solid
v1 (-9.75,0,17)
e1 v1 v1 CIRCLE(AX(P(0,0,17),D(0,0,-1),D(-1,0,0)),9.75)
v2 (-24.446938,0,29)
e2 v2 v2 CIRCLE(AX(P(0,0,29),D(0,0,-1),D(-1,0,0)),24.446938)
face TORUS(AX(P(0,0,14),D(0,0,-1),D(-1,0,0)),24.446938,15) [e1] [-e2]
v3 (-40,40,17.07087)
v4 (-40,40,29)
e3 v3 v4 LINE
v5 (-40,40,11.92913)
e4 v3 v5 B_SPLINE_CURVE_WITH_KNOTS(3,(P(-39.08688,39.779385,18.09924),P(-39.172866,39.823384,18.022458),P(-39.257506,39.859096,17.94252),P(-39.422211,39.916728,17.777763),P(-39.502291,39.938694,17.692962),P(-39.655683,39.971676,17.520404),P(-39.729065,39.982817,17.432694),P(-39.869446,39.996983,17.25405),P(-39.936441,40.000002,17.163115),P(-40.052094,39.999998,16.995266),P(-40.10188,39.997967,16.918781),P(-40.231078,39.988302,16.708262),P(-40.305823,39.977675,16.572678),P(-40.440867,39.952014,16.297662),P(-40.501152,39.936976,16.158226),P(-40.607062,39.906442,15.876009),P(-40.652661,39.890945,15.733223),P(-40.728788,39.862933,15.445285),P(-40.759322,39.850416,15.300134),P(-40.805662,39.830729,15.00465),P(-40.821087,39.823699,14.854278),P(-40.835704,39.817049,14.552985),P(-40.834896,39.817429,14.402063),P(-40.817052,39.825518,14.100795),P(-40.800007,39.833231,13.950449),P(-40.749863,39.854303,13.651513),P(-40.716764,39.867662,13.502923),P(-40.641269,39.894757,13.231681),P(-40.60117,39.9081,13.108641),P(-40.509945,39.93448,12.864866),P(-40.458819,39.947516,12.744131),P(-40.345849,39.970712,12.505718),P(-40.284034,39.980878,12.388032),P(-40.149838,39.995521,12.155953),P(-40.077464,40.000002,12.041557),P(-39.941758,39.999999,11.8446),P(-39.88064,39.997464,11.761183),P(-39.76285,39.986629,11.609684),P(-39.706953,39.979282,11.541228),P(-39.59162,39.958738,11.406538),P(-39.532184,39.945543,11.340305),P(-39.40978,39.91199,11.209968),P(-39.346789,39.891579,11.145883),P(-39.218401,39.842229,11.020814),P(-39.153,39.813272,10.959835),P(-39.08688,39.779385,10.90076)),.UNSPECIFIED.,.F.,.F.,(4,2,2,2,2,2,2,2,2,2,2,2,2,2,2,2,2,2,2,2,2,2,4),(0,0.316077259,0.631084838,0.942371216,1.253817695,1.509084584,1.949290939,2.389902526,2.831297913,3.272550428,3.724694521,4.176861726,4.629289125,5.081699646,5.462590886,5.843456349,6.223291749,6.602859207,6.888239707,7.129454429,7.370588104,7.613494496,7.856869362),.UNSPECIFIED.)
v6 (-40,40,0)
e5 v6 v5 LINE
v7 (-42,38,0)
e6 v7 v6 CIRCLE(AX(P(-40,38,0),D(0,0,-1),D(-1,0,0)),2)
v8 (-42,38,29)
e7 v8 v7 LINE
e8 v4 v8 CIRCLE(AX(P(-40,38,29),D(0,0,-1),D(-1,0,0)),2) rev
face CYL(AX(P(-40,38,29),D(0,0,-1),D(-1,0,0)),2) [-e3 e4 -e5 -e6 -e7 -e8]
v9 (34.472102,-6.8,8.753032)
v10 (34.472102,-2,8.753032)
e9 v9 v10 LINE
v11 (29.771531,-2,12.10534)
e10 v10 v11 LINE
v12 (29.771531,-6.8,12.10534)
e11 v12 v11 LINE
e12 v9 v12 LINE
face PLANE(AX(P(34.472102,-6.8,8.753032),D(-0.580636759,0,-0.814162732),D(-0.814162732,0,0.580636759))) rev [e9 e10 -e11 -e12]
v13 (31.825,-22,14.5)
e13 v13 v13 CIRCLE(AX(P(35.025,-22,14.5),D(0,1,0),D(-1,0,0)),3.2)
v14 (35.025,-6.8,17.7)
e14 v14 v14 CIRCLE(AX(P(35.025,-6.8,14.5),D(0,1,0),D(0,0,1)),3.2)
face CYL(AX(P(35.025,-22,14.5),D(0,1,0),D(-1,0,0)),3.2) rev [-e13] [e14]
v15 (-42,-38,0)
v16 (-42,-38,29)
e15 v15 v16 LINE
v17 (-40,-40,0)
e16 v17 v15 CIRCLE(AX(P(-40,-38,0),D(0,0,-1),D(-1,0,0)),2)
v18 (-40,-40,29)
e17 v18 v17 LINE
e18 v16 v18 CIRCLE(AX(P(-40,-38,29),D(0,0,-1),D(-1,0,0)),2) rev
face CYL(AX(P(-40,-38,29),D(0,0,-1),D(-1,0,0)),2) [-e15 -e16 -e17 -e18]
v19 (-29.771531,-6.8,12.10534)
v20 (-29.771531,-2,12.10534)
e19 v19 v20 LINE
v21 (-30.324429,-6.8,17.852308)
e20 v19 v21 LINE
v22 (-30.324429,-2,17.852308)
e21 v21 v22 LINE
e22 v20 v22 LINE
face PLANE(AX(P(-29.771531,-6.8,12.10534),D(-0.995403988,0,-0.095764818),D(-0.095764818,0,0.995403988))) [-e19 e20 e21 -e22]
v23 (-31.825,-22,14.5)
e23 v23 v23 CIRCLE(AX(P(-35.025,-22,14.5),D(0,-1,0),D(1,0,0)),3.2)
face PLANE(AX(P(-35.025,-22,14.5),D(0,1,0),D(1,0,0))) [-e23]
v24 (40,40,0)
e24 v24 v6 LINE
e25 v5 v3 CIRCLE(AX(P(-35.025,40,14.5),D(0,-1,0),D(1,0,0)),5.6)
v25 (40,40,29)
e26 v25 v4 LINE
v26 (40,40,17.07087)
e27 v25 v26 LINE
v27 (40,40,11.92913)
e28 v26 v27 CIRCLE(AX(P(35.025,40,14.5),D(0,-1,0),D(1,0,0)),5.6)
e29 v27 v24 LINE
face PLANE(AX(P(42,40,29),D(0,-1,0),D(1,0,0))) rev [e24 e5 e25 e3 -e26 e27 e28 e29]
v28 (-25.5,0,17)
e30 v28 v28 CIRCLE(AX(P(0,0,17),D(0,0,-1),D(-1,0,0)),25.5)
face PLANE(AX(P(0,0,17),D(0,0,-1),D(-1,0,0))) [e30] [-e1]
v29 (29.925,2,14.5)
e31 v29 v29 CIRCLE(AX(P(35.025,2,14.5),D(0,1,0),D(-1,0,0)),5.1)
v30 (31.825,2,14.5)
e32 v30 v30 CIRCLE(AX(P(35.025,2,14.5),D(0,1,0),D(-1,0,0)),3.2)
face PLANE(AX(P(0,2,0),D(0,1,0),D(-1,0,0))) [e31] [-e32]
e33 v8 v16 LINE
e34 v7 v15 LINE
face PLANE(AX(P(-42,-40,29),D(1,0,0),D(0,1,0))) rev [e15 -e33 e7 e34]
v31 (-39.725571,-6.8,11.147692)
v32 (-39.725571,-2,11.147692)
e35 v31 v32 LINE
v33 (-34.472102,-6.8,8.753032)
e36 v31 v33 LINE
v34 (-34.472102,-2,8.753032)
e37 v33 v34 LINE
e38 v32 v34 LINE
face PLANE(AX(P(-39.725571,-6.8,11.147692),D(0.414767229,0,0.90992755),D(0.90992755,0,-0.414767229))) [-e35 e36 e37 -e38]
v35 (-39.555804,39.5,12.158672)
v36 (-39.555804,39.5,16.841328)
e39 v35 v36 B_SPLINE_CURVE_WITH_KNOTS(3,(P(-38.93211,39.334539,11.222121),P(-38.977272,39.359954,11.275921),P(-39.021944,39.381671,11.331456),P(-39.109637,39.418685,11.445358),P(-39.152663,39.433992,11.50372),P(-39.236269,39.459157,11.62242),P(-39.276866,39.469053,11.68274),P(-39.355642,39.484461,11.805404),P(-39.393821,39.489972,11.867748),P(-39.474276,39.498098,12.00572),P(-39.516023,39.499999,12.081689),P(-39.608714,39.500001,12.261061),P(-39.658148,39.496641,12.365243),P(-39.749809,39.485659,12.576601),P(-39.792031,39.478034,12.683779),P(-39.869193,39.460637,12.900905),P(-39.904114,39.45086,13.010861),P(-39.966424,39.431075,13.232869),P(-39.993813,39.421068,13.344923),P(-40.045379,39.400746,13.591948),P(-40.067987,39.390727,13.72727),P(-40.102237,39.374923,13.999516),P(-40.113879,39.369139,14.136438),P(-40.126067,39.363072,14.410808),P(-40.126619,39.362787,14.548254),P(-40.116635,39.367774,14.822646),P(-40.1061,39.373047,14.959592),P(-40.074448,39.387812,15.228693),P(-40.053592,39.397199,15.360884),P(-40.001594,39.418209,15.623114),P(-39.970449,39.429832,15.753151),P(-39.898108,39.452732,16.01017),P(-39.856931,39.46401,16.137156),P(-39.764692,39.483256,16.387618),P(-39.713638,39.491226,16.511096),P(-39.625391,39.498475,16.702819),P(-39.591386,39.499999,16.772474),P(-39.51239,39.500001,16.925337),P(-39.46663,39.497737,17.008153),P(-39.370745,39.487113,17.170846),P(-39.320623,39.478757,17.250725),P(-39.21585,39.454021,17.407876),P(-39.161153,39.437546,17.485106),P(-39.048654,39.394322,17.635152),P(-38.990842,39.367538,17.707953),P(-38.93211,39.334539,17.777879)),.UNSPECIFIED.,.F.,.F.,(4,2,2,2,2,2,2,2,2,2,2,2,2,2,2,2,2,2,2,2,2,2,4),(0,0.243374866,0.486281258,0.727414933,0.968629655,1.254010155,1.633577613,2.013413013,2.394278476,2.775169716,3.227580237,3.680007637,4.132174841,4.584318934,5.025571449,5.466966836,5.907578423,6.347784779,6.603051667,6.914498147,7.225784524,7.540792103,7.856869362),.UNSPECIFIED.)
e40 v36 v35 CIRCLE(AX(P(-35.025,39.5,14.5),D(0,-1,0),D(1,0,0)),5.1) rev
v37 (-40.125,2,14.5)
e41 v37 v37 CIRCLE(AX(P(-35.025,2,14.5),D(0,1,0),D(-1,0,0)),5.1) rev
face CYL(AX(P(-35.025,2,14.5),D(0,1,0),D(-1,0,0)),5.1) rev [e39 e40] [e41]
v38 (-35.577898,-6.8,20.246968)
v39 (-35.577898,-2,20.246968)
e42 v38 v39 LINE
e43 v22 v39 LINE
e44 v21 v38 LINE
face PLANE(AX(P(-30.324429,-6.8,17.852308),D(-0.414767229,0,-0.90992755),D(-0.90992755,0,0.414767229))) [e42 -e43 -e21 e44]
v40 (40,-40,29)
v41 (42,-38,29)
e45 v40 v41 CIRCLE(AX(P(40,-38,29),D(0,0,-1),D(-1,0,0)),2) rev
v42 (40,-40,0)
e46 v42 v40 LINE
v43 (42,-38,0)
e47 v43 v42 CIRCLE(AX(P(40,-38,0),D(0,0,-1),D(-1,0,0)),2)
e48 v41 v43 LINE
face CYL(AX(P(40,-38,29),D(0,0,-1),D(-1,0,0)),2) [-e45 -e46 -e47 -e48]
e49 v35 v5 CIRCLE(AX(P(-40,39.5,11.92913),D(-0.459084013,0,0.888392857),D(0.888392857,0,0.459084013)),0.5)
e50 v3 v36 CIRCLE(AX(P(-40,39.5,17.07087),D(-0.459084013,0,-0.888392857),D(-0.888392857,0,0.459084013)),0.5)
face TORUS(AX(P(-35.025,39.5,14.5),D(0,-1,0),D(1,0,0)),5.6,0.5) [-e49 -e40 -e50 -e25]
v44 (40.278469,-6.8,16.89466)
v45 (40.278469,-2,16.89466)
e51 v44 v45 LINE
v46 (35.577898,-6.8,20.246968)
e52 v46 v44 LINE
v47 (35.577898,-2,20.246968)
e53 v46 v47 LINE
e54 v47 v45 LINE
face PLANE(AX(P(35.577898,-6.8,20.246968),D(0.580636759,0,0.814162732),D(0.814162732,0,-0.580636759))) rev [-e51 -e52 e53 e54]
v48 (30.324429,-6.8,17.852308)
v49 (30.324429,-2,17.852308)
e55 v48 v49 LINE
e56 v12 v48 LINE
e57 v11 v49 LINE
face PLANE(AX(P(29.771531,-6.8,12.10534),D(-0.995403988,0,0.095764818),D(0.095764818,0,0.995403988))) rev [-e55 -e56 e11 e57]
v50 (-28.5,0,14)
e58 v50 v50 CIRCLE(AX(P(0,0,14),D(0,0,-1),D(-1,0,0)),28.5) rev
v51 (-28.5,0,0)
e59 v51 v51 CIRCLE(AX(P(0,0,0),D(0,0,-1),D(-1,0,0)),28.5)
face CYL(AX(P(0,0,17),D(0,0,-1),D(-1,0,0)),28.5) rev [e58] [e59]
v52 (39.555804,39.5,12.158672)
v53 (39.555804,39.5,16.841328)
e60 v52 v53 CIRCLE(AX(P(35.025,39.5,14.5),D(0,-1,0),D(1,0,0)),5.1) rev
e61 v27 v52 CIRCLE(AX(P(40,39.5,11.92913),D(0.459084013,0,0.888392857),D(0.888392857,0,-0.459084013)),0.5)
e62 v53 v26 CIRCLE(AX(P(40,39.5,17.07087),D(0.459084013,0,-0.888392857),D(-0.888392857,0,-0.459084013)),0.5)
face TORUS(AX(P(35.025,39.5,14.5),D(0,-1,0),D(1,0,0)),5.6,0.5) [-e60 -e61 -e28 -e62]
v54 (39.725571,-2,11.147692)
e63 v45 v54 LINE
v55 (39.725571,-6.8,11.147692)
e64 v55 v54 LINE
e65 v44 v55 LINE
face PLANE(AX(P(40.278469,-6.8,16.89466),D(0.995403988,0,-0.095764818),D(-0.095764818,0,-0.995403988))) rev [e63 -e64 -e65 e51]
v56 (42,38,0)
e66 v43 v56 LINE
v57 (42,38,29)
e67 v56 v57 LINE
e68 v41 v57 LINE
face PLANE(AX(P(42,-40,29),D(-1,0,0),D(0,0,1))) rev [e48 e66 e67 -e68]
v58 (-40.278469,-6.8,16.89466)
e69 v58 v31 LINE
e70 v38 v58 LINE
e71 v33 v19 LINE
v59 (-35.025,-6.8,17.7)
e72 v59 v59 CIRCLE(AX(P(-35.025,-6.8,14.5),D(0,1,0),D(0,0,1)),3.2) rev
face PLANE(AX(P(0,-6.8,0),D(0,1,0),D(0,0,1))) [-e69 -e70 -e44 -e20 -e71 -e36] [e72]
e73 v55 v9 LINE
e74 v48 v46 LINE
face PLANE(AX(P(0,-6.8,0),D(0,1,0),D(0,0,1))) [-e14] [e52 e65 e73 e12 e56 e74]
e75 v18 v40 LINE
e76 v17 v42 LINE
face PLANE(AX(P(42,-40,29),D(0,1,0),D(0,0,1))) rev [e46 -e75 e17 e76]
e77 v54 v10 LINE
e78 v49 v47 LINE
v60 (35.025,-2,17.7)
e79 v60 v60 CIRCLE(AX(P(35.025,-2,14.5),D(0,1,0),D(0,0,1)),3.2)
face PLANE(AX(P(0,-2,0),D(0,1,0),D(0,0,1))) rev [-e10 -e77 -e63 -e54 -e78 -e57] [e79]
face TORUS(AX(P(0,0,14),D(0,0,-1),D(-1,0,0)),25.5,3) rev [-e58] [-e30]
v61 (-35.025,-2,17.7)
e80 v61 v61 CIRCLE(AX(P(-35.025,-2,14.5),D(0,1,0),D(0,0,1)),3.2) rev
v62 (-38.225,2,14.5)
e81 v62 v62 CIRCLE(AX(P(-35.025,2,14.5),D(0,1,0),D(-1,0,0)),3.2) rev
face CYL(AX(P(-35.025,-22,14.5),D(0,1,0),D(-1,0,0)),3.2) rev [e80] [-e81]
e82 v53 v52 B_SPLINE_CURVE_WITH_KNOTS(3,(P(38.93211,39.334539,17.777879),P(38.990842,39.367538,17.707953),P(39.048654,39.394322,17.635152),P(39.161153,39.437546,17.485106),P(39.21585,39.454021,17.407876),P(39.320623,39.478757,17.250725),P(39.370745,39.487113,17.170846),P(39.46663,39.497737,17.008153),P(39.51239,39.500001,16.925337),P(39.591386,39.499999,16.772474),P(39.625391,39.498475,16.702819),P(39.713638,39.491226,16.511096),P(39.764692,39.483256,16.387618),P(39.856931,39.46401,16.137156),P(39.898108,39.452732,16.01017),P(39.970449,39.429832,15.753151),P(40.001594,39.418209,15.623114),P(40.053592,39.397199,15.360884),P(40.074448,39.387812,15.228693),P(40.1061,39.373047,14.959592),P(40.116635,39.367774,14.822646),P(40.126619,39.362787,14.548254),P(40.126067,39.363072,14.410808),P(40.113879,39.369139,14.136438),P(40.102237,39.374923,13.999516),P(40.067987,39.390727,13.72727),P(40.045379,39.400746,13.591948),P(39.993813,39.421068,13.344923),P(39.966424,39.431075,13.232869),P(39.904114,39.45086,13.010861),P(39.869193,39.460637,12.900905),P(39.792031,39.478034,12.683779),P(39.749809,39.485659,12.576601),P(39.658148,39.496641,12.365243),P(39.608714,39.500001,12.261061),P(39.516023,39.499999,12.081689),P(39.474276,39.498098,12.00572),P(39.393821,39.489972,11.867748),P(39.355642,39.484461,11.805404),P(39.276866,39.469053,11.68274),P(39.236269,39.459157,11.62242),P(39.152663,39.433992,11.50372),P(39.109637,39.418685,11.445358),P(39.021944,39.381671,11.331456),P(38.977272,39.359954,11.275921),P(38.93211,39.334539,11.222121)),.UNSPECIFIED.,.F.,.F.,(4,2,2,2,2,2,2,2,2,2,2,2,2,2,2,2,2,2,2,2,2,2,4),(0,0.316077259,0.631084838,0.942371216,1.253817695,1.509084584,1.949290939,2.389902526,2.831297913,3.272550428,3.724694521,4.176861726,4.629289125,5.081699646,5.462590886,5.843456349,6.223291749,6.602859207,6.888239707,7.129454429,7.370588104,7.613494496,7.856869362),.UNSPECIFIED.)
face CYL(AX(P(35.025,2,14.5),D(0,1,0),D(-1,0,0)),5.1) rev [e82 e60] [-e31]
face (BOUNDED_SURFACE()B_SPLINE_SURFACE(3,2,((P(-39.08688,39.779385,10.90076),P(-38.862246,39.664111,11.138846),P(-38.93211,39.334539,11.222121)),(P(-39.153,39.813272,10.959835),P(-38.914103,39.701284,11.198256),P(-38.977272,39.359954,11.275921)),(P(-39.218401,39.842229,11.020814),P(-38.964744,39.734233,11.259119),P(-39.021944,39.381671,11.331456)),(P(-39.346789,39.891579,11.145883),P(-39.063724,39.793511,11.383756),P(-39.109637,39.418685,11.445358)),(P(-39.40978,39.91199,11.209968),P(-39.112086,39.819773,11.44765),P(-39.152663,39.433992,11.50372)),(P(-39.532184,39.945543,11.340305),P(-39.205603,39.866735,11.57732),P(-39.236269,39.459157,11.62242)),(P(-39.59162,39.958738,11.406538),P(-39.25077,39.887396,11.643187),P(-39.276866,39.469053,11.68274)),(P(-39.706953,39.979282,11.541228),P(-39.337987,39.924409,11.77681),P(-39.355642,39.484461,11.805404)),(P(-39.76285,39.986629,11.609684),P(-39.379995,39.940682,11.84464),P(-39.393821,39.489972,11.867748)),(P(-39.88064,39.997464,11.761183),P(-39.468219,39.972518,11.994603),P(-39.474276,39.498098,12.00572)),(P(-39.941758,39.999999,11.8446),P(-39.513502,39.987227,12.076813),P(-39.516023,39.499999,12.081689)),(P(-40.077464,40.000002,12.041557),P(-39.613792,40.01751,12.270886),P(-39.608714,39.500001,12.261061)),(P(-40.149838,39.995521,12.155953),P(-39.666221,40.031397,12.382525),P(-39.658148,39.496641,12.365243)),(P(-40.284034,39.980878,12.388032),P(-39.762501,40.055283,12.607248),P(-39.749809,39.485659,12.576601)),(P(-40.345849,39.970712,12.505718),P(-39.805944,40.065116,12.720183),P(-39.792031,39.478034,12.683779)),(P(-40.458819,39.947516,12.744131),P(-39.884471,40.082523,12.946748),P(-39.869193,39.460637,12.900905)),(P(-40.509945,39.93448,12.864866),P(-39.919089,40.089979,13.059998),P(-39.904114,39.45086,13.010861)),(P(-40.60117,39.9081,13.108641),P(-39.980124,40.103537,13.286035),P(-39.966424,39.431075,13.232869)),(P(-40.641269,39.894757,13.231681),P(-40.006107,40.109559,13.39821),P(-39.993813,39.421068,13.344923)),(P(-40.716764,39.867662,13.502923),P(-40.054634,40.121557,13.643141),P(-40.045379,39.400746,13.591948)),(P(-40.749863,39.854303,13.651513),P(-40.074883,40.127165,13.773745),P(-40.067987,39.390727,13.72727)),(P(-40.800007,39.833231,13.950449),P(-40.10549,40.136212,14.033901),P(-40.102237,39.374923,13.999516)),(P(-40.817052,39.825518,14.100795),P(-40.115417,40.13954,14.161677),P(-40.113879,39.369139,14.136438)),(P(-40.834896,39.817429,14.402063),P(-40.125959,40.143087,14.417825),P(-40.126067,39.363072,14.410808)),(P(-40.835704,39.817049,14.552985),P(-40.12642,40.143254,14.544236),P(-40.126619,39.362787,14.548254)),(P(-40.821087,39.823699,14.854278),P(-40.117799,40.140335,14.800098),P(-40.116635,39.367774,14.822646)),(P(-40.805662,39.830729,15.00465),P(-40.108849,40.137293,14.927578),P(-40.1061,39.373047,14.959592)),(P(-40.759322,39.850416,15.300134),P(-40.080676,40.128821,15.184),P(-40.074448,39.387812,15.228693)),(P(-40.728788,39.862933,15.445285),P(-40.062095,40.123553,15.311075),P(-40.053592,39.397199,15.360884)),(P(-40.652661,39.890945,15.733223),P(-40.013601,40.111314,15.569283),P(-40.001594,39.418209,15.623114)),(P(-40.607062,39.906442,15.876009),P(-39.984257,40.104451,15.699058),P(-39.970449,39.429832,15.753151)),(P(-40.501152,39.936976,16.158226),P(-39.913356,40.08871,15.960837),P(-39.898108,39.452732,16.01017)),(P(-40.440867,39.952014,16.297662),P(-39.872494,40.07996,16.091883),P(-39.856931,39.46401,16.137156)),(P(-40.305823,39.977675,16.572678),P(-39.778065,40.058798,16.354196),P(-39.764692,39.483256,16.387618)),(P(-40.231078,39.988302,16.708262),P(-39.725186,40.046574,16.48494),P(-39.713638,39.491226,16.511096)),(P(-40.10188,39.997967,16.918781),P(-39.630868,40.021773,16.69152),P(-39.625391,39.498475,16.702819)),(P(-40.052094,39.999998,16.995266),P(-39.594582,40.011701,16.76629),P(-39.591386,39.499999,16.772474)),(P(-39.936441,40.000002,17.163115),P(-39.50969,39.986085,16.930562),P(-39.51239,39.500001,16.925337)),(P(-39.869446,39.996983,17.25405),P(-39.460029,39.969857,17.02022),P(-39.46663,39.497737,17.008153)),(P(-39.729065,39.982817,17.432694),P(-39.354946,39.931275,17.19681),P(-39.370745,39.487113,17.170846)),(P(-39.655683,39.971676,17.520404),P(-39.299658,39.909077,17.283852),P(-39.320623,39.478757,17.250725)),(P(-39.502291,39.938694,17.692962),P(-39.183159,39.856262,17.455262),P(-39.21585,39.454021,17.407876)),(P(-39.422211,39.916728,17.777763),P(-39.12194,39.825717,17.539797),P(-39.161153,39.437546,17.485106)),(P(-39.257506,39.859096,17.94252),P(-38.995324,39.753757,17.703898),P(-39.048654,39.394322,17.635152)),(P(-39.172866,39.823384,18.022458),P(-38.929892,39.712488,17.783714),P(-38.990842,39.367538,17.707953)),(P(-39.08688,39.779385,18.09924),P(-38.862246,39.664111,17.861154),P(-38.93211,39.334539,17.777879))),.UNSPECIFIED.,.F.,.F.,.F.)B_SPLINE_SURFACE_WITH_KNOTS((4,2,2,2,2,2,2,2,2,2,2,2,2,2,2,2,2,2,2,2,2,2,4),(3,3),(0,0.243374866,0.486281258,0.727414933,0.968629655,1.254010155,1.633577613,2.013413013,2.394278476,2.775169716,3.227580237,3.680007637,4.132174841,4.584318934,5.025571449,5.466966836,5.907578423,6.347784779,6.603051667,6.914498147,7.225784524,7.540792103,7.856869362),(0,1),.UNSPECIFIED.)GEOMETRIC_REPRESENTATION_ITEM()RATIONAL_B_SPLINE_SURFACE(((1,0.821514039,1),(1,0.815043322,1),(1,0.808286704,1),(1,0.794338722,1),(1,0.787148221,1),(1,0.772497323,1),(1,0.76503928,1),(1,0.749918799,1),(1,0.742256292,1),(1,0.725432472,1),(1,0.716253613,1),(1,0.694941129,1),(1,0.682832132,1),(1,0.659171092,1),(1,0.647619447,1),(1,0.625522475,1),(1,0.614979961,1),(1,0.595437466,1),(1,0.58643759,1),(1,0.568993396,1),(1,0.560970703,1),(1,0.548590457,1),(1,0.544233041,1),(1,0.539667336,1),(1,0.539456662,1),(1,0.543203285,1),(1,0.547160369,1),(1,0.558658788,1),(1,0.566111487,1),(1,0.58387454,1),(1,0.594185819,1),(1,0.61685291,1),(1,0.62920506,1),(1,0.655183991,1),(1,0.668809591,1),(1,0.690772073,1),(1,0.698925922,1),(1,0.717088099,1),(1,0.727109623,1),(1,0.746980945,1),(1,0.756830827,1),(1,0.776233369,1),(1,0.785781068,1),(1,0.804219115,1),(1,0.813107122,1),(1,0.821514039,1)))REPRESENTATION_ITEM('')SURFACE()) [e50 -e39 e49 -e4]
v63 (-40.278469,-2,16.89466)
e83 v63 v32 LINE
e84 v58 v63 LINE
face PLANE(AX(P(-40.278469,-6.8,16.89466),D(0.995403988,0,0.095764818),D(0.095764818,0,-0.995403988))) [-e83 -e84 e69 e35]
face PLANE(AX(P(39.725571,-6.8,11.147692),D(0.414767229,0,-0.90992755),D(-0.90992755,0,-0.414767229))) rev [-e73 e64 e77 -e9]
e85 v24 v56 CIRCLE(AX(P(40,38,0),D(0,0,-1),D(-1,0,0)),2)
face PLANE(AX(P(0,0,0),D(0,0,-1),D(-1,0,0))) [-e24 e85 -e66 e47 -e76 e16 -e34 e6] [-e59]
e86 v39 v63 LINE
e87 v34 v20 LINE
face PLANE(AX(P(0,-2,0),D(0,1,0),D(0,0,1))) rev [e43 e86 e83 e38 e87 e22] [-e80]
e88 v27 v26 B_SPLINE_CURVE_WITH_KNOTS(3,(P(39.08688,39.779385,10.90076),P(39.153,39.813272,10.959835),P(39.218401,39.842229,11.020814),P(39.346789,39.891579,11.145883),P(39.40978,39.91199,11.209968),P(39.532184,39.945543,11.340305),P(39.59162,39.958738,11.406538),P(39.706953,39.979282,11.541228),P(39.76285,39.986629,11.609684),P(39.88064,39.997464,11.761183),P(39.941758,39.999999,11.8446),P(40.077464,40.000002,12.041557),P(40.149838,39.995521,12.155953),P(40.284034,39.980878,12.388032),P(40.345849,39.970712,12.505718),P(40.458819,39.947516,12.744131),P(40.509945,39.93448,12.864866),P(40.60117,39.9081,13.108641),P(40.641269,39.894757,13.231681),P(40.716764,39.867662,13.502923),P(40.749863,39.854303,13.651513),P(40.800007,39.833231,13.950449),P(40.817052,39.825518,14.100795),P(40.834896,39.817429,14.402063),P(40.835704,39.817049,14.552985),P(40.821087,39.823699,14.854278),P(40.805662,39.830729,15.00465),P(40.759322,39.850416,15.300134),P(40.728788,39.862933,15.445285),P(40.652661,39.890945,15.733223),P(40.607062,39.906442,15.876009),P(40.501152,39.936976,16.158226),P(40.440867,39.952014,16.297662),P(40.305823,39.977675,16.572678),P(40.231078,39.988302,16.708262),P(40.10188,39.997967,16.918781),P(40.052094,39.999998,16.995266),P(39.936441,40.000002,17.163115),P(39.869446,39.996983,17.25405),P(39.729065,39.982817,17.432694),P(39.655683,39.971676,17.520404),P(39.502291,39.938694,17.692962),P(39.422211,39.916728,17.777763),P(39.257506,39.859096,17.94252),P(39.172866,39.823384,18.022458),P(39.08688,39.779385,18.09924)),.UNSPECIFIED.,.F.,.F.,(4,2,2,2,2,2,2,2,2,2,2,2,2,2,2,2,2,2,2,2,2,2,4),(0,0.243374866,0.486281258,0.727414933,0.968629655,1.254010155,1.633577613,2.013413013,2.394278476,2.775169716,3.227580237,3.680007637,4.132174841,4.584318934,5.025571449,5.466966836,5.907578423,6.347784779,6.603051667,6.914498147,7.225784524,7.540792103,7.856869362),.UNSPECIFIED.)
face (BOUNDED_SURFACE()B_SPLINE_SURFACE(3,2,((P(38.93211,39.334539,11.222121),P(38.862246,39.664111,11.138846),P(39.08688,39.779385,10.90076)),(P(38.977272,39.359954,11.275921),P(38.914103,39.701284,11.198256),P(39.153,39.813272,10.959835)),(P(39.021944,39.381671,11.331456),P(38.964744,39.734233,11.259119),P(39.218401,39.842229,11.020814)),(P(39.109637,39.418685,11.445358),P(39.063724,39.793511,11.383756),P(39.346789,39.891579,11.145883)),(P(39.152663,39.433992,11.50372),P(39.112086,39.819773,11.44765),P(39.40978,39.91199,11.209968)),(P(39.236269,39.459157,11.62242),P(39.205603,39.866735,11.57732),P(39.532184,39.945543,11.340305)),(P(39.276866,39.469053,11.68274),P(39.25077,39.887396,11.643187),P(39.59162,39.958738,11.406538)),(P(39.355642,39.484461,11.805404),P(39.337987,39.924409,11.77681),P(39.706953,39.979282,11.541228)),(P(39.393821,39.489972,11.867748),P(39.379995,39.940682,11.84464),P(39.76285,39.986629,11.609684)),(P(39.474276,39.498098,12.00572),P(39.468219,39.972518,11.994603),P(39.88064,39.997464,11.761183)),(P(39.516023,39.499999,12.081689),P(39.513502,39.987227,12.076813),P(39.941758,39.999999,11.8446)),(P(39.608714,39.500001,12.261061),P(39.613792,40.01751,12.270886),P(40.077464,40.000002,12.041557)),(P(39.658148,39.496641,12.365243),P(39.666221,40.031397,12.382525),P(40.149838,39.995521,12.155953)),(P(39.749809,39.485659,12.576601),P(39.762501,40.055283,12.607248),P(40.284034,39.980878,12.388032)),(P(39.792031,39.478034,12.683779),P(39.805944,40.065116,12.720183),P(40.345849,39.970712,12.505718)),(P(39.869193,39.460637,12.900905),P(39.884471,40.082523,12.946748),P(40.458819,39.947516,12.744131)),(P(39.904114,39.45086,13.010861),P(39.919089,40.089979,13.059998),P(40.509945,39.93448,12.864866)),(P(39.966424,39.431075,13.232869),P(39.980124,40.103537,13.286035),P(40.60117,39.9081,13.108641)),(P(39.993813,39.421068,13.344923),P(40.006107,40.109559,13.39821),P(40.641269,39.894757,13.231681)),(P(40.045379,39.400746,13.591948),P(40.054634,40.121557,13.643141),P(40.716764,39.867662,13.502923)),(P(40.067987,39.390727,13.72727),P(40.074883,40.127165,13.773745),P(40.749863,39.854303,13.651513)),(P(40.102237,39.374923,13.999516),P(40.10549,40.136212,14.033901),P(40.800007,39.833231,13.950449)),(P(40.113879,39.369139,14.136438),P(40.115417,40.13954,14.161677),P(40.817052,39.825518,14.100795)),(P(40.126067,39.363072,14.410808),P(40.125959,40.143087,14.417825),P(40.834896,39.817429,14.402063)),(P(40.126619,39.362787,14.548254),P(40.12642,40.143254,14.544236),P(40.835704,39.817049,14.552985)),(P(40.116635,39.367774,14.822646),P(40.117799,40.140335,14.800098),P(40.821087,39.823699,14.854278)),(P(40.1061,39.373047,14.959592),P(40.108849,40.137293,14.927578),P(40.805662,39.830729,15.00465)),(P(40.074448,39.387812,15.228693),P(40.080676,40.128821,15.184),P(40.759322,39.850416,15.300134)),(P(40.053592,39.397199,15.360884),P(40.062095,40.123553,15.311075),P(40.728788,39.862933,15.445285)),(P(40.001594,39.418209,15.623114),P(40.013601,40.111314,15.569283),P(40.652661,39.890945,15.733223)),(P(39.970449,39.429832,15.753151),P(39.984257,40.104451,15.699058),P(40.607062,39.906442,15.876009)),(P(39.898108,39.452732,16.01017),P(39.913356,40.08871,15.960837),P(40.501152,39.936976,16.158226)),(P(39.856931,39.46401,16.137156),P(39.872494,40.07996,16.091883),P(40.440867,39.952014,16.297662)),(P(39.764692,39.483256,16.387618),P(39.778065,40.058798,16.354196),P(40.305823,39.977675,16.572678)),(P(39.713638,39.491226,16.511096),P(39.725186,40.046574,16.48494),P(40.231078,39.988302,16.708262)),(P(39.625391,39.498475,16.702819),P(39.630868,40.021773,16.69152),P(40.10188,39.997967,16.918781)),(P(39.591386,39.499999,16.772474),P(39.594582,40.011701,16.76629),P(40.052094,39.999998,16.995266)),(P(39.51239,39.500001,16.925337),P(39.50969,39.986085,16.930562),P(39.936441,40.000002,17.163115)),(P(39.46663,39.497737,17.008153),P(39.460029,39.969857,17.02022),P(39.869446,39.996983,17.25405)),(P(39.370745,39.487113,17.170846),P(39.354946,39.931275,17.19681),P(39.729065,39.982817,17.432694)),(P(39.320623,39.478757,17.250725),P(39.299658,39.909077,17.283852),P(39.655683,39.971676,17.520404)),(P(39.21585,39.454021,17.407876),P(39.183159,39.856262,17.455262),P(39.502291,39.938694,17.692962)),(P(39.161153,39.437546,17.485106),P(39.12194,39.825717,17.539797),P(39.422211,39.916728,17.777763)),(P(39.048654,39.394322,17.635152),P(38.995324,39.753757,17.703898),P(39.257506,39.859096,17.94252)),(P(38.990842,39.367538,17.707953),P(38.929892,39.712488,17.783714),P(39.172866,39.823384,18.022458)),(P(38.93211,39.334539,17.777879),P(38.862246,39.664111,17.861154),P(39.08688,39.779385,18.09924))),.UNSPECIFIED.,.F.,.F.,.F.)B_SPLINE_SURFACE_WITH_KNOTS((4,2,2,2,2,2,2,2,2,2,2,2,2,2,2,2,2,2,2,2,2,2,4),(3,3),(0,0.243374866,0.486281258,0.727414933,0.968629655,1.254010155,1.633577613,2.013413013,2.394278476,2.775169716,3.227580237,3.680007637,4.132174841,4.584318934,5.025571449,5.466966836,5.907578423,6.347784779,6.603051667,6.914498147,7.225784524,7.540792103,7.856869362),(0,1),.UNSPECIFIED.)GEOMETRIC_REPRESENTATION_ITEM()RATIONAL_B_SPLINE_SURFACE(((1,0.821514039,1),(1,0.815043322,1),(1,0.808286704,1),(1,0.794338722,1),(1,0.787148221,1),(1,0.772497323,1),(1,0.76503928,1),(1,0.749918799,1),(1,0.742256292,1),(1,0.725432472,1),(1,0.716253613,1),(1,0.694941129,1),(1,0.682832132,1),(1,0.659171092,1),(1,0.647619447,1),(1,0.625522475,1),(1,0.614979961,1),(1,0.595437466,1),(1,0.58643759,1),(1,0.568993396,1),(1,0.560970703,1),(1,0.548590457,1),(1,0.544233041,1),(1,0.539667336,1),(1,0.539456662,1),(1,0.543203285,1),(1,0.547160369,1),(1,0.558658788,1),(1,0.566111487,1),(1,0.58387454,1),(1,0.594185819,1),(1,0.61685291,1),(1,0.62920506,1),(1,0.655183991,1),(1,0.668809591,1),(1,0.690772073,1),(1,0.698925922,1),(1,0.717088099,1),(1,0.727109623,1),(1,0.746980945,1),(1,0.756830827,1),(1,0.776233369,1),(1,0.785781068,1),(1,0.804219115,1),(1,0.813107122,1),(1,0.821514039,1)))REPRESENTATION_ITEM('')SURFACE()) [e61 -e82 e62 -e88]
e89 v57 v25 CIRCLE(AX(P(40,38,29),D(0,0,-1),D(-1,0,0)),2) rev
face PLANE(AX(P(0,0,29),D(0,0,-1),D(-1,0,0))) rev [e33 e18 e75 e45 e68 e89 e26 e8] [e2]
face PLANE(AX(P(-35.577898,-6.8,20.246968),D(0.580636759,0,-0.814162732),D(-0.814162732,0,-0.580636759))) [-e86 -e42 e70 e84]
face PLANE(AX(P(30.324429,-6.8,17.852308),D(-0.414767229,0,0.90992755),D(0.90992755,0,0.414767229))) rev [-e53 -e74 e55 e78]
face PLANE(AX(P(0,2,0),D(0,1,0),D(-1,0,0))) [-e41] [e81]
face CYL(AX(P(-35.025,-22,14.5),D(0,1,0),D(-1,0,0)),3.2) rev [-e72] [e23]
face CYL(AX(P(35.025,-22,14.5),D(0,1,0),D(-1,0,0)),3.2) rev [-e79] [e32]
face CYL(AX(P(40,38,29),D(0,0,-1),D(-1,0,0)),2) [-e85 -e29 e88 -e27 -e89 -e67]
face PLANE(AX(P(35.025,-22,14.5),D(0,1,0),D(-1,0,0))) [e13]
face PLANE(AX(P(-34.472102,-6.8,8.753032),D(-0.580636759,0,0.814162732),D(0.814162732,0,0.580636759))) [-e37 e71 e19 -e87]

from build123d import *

# Parameters (mm, degrees)
SKETCH1_W          = 80
SKETCH1_H          = 84
SKETCH1_R          = 9.75
MAIN_BOSS_DEPTH    = 29
SKETCH2_R          = 28.5
CUT_EXTRUDE1_DEPTH = 17
FILLET1_R          = 15
SKETCH3_R          = 5.1
SCREW_HEAD_DEPTH   = 38
NUT_START          = -42
NUT_SLOT_DEPTH     = 4.8
SKETCH5_R          = 3.2
THROUGH_HOLE_DEPTH = 62
FILLET2_R          = 3
FILLET3_R          = 2
FILLET4_R          = 0.5


with BuildPart() as part:
    # Sketch1 → Main Boss (new body)
    with BuildSketch(Plane(origin=(0, 0, 0), x_dir=(0, 1, 0), z_dir=(0, 0, 1))):
        Rectangle(SKETCH1_W, SKETCH1_H)
        with Locations(Location((0, 0, 0), (0, 0, 90))):
            Circle(SKETCH1_R, mode=Mode.SUBTRACT)
    extrude(amount=MAIN_BOSS_DEPTH)

    # Sketch2 → Cut-Extrude1 (cut)
    with BuildSketch(Plane(origin=(0, 0, 0), x_dir=(1, 0, 0), z_dir=(0, 0, -1))):
        with Locations(Location((0, 0, 0), (0, 0, 180))):
            Circle(SKETCH2_R)
    extrude(amount=-CUT_EXTRUDE1_DEPTH, mode=Mode.SUBTRACT)

    # Fillet1
    # the kernel refuses this fillet: 15 mm, written as the material it takes off along each edge
    with BuildSketch(Plane(origin=(0, 0, 29), x_dir=(-1, 0, 0), z_dir=(0, 1, 0))) as fillet1_piece_1:
        with BuildLine():
            CenterArc((24.446938457, -15), FILLET1_R, 90, 78.463040967)
            Line((9.75, -12), (9.456061231, -11.94))
            ThreePointArc((9.456061231, -11.94), (9.45, -6), (9.45, 0))
            Line((9.45, 0), (9.75, 0.3))
            Line((9.75, 0.3), (24.446938457, 0.3))
            Line((24.446938457, 0.3), (24.446938457, 0))
        make_face()
    revolve(axis=Axis((0, 0, 29), (0, 0, 1)), mode=Mode.SUBTRACT)

    # Sketch3 → Screw Head (cut)
    with BuildSketch(Plane(origin=(0, 40, 0), x_dir=(-1, 0, 0), z_dir=(0, 1, 0))):
        with Locations((-35.025, 14.5)):
            Circle(SKETCH3_R)
        with Locations((35.025, 14.5)):
            Circle(SKETCH3_R)
    extrude(amount=-SCREW_HEAD_DEPTH, mode=Mode.SUBTRACT)

    # Sketch4 → Nut Slot (cut)
    with BuildSketch(Plane(origin=(0, 40, 0), x_dir=(-1, 0, 0), z_dir=(0, 1, 0)).offset(NUT_START)):
        Polygon((-30.324429276, 17.852307892), (-35.577898433, 20.246967605), (-40.278469158, 16.894659714), (-39.725570724, 11.147692108), (-34.472101567, 8.753032395), (-29.771530842, 12.105340286), align=None)
    nut_slot = extrude(amount=-NUT_SLOT_DEPTH, mode=Mode.SUBTRACT)

    # Sketch5 → Through Hole (cut)
    with BuildSketch(Plane(origin=(0, 40, 0), x_dir=(-1, 0, 0), z_dir=(0, 1, 0))):
        with Locations((-35.025, 14.5)):
            Circle(SKETCH5_R)
    through_hole = extrude(amount=-THROUGH_HOLE_DEPTH, mode=Mode.SUBTRACT)

    # Mirror2: Nut Slot, Through Hole across plane
    add(nut_slot.mirror(Plane(origin=(0, 0, 0), x_dir=(0, 0, 1), z_dir=(1, 0, 0))), mode=Mode.SUBTRACT)
    add(through_hole.mirror(Plane(origin=(0, 0, 0), x_dir=(0, 0, 1), z_dir=(1, 0, 0))), mode=Mode.SUBTRACT)

    # Fillet2
    fillet2_edges = [part.edges().sort_by_distance(p)[0] for p in [
        (28.5, 0, 17),
    ]]
    fillet(fillet2_edges, radius=FILLET2_R)

    # Fillet3
    # the kernel refuses this fillet: 2 mm, written as the material it takes off along each edge
    with BuildSketch(Plane(origin=(42, 40, -5), x_dir=(0, -1, 0), z_dir=(0, 0, 1)), Plane(origin=(-42, 40, -5), x_dir=(1, 0, 0), z_dir=(0, 0, 1))) as fillet3_piece_1:
        with BuildLine():
            CenterArc((FILLET3_R, -FILLET3_R), FILLET3_R, 90, 90)
            Line((0, -FILLET3_R), (0, 0))
            Line((0, 0), (FILLET3_R, 0))
        make_face()
    extrude(amount=39, mode=Mode.SUBTRACT)
    with BuildSketch(Plane(origin=(42, -40, -5), x_dir=(0, 1, 0), z_dir=(0, 0, 1)), Plane(origin=(-42, -40, -5), x_dir=(1, 0, 0), z_dir=(0, 0, 1))) as fillet3_piece_2:
        with BuildLine():
            CenterArc((FILLET3_R, FILLET3_R), FILLET3_R, 180, 90)
            Line((0, FILLET3_R), (0, 0))
            Line((0, 0), (FILLET3_R, 0))
        make_face()
    extrude(amount=39, mode=Mode.SUBTRACT)

    # Fillet4
    fillet4_edges = [part.edges().sort_by_distance(p)[0] for p in [
        (34.46042051, 40, 19.568653667),
        (-40.093653599, 39.997806015, 15.064580313),
        (40.125, 39.996089928, 14.5),
        (-29.925, 40, 14.5),
    ]]
    fillet(fillet4_edges, radius=FILLET4_R)


solid = part.part
